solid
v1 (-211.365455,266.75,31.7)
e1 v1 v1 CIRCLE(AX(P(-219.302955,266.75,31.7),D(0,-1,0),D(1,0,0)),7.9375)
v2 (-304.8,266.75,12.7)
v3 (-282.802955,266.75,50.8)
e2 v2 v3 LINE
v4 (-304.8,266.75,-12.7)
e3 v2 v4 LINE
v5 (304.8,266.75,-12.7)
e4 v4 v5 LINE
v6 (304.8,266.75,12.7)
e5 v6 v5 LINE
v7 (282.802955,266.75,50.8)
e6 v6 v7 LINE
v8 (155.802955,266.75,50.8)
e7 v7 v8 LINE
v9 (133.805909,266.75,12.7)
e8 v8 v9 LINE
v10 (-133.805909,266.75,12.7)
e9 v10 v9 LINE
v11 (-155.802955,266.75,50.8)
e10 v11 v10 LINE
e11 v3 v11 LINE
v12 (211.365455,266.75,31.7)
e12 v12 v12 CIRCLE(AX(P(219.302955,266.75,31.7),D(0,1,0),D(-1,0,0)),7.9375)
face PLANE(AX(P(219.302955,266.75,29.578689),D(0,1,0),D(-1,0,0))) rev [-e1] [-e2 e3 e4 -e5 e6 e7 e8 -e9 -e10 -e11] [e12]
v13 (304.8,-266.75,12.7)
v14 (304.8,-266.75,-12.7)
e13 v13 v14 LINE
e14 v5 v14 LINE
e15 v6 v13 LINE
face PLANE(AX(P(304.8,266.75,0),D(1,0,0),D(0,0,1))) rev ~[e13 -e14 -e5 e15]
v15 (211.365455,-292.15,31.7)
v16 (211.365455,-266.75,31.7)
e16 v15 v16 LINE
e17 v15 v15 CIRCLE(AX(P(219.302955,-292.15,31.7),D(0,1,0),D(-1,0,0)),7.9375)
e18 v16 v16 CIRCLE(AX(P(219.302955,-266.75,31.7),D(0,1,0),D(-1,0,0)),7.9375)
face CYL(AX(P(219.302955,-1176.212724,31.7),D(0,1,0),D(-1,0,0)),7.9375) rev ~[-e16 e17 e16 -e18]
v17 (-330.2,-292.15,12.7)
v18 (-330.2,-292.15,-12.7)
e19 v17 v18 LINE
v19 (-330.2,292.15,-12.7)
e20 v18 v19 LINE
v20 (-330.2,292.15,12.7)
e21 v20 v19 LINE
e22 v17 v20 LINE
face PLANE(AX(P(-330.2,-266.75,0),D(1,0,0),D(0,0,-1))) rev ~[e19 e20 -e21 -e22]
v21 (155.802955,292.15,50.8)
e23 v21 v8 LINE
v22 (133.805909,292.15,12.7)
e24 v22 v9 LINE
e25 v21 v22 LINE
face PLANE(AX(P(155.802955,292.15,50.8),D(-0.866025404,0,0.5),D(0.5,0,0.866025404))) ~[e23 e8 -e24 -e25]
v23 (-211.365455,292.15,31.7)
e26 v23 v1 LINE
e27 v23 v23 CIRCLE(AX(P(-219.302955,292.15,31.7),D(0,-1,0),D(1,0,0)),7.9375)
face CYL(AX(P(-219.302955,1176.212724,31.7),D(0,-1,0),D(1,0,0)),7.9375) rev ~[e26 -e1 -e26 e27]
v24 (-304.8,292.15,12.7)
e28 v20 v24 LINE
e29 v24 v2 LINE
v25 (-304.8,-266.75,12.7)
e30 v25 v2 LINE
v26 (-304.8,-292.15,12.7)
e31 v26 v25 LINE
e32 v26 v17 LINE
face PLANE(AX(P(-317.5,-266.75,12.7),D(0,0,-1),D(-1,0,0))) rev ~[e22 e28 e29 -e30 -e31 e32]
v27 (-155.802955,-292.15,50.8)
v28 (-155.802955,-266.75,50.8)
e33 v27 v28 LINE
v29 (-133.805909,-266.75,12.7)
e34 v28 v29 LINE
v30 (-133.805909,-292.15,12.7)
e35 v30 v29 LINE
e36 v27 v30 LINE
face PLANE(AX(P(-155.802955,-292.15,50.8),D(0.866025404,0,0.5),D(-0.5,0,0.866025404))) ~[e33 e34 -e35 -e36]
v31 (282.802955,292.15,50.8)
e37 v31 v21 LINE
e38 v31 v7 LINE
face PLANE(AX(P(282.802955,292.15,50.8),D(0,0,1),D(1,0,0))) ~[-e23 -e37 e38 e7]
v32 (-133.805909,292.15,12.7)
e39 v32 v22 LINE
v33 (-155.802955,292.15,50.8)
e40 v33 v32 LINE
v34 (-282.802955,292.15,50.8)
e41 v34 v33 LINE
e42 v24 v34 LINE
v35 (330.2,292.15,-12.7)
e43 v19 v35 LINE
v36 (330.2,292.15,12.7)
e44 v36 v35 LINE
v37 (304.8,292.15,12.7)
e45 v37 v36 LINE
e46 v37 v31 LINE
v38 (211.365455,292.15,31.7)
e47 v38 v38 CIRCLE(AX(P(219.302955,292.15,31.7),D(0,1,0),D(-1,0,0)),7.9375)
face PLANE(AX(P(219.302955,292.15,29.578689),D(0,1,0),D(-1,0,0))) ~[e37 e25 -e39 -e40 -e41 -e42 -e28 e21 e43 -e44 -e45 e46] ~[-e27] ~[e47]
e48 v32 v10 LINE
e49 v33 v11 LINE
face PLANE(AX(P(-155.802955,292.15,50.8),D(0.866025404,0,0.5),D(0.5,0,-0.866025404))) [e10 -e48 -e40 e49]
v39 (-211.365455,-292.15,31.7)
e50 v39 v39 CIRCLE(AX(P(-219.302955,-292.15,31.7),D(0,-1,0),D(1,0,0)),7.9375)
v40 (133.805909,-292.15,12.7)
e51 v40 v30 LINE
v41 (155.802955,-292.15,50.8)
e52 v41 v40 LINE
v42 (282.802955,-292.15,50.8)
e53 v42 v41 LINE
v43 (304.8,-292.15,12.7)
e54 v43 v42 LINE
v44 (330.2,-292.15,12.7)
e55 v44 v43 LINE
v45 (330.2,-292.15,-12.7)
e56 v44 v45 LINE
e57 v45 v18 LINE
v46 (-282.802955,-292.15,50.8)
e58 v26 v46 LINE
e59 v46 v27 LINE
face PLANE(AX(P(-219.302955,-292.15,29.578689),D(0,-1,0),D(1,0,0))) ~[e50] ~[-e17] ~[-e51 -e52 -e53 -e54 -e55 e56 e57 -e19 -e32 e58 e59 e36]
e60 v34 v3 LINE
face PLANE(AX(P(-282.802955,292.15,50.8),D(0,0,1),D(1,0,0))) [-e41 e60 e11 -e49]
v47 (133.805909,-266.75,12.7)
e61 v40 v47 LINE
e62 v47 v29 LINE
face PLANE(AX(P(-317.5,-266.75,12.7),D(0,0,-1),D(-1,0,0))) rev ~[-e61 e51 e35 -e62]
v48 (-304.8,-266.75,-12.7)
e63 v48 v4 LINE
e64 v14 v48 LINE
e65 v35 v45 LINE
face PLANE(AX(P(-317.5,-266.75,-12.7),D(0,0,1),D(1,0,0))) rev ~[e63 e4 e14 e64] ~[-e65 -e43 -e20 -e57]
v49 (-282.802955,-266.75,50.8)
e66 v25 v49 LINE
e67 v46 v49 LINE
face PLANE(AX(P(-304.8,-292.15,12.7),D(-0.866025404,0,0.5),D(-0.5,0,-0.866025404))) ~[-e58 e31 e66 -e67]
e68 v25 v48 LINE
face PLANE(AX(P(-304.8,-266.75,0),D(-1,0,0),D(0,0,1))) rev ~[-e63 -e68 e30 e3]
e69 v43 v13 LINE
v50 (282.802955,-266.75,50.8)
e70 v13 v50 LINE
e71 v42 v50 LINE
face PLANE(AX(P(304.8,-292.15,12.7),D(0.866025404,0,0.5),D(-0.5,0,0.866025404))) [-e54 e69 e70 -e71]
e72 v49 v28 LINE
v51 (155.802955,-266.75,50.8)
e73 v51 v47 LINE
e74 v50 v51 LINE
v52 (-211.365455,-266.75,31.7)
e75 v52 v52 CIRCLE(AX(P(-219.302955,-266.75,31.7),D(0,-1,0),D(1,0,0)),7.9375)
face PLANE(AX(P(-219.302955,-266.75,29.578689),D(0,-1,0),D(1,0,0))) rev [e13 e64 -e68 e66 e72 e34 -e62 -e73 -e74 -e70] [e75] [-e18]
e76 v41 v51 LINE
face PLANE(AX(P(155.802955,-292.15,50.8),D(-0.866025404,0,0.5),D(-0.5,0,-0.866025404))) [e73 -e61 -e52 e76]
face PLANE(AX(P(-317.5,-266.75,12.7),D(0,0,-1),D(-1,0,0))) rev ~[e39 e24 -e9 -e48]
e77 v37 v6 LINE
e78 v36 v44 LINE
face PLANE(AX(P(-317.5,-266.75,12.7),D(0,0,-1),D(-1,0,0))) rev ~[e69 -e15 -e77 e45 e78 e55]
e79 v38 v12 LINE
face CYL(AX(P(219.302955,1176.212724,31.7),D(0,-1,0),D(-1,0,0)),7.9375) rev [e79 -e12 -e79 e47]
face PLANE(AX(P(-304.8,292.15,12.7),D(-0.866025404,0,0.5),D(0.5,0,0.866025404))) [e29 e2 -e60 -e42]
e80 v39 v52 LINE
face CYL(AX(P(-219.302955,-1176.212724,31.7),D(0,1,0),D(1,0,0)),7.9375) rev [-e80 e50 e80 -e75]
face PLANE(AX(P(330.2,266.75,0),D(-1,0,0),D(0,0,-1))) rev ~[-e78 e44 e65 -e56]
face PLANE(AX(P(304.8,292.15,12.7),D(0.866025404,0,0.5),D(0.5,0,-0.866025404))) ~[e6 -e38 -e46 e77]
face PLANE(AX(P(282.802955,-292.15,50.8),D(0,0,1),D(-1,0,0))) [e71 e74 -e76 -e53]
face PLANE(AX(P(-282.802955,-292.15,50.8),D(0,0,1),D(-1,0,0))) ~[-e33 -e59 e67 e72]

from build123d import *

# Parameters (mm, degrees)
F1_W     = 25.4
F1_H     = 25.4
F4_DEPTH = 25.4
F5_D     = 15.875


with BuildPart() as f2:
    # F2: sweep along a path in F0
    with BuildLine(Plane.XY) as f2_path:
        Line((-304.8, -266.75), (-304.8, 266.75))
        Line((-304.8, 266.75), (304.8, 266.75))
        Line((304.8, 266.75), (304.8, -266.75))
        Line((304.8, -266.75), (-304.8, -266.75))
    # F1 (on Front) → F2 (sweep)
    with BuildSketch(Plane.XZ):
        with Locations((-317.5, 0)):
            Rectangle(F1_W, F1_H)
    sweep(path=f2_path.line, transition=Transition.RIGHT)

    # F3 (on face) → F4 (join, through all)
    with BuildSketch(Plane.XZ.offset(292.15)):
        Polygon((133.8059094878, 12.7), (304.8, 12.7), (282.8029547439, 50.8), (155.8029547439, 50.8), align=None)
    extrude(amount=-F4_DEPTH)

    # F5 (through all)
    with Locations(Plane.XZ.offset(292.15)):
        with Locations((219.3029547439, 31.7)):
            Hole(F5_D / 2)


with BuildPart() as f6_1:
    # F6: instance of F2
    add(f2.part.mirror(Plane.YZ))


with BuildPart() as f2_1:
    add(f2.part)

    add(f6_1.part)  # F7 merges F6_1
    # F7: F6_1, F2 across plane
    add(f6_1.part.mirror(Plane.XZ))
    add(f2.part.mirror(Plane.XZ))


solid = f2_1.part
